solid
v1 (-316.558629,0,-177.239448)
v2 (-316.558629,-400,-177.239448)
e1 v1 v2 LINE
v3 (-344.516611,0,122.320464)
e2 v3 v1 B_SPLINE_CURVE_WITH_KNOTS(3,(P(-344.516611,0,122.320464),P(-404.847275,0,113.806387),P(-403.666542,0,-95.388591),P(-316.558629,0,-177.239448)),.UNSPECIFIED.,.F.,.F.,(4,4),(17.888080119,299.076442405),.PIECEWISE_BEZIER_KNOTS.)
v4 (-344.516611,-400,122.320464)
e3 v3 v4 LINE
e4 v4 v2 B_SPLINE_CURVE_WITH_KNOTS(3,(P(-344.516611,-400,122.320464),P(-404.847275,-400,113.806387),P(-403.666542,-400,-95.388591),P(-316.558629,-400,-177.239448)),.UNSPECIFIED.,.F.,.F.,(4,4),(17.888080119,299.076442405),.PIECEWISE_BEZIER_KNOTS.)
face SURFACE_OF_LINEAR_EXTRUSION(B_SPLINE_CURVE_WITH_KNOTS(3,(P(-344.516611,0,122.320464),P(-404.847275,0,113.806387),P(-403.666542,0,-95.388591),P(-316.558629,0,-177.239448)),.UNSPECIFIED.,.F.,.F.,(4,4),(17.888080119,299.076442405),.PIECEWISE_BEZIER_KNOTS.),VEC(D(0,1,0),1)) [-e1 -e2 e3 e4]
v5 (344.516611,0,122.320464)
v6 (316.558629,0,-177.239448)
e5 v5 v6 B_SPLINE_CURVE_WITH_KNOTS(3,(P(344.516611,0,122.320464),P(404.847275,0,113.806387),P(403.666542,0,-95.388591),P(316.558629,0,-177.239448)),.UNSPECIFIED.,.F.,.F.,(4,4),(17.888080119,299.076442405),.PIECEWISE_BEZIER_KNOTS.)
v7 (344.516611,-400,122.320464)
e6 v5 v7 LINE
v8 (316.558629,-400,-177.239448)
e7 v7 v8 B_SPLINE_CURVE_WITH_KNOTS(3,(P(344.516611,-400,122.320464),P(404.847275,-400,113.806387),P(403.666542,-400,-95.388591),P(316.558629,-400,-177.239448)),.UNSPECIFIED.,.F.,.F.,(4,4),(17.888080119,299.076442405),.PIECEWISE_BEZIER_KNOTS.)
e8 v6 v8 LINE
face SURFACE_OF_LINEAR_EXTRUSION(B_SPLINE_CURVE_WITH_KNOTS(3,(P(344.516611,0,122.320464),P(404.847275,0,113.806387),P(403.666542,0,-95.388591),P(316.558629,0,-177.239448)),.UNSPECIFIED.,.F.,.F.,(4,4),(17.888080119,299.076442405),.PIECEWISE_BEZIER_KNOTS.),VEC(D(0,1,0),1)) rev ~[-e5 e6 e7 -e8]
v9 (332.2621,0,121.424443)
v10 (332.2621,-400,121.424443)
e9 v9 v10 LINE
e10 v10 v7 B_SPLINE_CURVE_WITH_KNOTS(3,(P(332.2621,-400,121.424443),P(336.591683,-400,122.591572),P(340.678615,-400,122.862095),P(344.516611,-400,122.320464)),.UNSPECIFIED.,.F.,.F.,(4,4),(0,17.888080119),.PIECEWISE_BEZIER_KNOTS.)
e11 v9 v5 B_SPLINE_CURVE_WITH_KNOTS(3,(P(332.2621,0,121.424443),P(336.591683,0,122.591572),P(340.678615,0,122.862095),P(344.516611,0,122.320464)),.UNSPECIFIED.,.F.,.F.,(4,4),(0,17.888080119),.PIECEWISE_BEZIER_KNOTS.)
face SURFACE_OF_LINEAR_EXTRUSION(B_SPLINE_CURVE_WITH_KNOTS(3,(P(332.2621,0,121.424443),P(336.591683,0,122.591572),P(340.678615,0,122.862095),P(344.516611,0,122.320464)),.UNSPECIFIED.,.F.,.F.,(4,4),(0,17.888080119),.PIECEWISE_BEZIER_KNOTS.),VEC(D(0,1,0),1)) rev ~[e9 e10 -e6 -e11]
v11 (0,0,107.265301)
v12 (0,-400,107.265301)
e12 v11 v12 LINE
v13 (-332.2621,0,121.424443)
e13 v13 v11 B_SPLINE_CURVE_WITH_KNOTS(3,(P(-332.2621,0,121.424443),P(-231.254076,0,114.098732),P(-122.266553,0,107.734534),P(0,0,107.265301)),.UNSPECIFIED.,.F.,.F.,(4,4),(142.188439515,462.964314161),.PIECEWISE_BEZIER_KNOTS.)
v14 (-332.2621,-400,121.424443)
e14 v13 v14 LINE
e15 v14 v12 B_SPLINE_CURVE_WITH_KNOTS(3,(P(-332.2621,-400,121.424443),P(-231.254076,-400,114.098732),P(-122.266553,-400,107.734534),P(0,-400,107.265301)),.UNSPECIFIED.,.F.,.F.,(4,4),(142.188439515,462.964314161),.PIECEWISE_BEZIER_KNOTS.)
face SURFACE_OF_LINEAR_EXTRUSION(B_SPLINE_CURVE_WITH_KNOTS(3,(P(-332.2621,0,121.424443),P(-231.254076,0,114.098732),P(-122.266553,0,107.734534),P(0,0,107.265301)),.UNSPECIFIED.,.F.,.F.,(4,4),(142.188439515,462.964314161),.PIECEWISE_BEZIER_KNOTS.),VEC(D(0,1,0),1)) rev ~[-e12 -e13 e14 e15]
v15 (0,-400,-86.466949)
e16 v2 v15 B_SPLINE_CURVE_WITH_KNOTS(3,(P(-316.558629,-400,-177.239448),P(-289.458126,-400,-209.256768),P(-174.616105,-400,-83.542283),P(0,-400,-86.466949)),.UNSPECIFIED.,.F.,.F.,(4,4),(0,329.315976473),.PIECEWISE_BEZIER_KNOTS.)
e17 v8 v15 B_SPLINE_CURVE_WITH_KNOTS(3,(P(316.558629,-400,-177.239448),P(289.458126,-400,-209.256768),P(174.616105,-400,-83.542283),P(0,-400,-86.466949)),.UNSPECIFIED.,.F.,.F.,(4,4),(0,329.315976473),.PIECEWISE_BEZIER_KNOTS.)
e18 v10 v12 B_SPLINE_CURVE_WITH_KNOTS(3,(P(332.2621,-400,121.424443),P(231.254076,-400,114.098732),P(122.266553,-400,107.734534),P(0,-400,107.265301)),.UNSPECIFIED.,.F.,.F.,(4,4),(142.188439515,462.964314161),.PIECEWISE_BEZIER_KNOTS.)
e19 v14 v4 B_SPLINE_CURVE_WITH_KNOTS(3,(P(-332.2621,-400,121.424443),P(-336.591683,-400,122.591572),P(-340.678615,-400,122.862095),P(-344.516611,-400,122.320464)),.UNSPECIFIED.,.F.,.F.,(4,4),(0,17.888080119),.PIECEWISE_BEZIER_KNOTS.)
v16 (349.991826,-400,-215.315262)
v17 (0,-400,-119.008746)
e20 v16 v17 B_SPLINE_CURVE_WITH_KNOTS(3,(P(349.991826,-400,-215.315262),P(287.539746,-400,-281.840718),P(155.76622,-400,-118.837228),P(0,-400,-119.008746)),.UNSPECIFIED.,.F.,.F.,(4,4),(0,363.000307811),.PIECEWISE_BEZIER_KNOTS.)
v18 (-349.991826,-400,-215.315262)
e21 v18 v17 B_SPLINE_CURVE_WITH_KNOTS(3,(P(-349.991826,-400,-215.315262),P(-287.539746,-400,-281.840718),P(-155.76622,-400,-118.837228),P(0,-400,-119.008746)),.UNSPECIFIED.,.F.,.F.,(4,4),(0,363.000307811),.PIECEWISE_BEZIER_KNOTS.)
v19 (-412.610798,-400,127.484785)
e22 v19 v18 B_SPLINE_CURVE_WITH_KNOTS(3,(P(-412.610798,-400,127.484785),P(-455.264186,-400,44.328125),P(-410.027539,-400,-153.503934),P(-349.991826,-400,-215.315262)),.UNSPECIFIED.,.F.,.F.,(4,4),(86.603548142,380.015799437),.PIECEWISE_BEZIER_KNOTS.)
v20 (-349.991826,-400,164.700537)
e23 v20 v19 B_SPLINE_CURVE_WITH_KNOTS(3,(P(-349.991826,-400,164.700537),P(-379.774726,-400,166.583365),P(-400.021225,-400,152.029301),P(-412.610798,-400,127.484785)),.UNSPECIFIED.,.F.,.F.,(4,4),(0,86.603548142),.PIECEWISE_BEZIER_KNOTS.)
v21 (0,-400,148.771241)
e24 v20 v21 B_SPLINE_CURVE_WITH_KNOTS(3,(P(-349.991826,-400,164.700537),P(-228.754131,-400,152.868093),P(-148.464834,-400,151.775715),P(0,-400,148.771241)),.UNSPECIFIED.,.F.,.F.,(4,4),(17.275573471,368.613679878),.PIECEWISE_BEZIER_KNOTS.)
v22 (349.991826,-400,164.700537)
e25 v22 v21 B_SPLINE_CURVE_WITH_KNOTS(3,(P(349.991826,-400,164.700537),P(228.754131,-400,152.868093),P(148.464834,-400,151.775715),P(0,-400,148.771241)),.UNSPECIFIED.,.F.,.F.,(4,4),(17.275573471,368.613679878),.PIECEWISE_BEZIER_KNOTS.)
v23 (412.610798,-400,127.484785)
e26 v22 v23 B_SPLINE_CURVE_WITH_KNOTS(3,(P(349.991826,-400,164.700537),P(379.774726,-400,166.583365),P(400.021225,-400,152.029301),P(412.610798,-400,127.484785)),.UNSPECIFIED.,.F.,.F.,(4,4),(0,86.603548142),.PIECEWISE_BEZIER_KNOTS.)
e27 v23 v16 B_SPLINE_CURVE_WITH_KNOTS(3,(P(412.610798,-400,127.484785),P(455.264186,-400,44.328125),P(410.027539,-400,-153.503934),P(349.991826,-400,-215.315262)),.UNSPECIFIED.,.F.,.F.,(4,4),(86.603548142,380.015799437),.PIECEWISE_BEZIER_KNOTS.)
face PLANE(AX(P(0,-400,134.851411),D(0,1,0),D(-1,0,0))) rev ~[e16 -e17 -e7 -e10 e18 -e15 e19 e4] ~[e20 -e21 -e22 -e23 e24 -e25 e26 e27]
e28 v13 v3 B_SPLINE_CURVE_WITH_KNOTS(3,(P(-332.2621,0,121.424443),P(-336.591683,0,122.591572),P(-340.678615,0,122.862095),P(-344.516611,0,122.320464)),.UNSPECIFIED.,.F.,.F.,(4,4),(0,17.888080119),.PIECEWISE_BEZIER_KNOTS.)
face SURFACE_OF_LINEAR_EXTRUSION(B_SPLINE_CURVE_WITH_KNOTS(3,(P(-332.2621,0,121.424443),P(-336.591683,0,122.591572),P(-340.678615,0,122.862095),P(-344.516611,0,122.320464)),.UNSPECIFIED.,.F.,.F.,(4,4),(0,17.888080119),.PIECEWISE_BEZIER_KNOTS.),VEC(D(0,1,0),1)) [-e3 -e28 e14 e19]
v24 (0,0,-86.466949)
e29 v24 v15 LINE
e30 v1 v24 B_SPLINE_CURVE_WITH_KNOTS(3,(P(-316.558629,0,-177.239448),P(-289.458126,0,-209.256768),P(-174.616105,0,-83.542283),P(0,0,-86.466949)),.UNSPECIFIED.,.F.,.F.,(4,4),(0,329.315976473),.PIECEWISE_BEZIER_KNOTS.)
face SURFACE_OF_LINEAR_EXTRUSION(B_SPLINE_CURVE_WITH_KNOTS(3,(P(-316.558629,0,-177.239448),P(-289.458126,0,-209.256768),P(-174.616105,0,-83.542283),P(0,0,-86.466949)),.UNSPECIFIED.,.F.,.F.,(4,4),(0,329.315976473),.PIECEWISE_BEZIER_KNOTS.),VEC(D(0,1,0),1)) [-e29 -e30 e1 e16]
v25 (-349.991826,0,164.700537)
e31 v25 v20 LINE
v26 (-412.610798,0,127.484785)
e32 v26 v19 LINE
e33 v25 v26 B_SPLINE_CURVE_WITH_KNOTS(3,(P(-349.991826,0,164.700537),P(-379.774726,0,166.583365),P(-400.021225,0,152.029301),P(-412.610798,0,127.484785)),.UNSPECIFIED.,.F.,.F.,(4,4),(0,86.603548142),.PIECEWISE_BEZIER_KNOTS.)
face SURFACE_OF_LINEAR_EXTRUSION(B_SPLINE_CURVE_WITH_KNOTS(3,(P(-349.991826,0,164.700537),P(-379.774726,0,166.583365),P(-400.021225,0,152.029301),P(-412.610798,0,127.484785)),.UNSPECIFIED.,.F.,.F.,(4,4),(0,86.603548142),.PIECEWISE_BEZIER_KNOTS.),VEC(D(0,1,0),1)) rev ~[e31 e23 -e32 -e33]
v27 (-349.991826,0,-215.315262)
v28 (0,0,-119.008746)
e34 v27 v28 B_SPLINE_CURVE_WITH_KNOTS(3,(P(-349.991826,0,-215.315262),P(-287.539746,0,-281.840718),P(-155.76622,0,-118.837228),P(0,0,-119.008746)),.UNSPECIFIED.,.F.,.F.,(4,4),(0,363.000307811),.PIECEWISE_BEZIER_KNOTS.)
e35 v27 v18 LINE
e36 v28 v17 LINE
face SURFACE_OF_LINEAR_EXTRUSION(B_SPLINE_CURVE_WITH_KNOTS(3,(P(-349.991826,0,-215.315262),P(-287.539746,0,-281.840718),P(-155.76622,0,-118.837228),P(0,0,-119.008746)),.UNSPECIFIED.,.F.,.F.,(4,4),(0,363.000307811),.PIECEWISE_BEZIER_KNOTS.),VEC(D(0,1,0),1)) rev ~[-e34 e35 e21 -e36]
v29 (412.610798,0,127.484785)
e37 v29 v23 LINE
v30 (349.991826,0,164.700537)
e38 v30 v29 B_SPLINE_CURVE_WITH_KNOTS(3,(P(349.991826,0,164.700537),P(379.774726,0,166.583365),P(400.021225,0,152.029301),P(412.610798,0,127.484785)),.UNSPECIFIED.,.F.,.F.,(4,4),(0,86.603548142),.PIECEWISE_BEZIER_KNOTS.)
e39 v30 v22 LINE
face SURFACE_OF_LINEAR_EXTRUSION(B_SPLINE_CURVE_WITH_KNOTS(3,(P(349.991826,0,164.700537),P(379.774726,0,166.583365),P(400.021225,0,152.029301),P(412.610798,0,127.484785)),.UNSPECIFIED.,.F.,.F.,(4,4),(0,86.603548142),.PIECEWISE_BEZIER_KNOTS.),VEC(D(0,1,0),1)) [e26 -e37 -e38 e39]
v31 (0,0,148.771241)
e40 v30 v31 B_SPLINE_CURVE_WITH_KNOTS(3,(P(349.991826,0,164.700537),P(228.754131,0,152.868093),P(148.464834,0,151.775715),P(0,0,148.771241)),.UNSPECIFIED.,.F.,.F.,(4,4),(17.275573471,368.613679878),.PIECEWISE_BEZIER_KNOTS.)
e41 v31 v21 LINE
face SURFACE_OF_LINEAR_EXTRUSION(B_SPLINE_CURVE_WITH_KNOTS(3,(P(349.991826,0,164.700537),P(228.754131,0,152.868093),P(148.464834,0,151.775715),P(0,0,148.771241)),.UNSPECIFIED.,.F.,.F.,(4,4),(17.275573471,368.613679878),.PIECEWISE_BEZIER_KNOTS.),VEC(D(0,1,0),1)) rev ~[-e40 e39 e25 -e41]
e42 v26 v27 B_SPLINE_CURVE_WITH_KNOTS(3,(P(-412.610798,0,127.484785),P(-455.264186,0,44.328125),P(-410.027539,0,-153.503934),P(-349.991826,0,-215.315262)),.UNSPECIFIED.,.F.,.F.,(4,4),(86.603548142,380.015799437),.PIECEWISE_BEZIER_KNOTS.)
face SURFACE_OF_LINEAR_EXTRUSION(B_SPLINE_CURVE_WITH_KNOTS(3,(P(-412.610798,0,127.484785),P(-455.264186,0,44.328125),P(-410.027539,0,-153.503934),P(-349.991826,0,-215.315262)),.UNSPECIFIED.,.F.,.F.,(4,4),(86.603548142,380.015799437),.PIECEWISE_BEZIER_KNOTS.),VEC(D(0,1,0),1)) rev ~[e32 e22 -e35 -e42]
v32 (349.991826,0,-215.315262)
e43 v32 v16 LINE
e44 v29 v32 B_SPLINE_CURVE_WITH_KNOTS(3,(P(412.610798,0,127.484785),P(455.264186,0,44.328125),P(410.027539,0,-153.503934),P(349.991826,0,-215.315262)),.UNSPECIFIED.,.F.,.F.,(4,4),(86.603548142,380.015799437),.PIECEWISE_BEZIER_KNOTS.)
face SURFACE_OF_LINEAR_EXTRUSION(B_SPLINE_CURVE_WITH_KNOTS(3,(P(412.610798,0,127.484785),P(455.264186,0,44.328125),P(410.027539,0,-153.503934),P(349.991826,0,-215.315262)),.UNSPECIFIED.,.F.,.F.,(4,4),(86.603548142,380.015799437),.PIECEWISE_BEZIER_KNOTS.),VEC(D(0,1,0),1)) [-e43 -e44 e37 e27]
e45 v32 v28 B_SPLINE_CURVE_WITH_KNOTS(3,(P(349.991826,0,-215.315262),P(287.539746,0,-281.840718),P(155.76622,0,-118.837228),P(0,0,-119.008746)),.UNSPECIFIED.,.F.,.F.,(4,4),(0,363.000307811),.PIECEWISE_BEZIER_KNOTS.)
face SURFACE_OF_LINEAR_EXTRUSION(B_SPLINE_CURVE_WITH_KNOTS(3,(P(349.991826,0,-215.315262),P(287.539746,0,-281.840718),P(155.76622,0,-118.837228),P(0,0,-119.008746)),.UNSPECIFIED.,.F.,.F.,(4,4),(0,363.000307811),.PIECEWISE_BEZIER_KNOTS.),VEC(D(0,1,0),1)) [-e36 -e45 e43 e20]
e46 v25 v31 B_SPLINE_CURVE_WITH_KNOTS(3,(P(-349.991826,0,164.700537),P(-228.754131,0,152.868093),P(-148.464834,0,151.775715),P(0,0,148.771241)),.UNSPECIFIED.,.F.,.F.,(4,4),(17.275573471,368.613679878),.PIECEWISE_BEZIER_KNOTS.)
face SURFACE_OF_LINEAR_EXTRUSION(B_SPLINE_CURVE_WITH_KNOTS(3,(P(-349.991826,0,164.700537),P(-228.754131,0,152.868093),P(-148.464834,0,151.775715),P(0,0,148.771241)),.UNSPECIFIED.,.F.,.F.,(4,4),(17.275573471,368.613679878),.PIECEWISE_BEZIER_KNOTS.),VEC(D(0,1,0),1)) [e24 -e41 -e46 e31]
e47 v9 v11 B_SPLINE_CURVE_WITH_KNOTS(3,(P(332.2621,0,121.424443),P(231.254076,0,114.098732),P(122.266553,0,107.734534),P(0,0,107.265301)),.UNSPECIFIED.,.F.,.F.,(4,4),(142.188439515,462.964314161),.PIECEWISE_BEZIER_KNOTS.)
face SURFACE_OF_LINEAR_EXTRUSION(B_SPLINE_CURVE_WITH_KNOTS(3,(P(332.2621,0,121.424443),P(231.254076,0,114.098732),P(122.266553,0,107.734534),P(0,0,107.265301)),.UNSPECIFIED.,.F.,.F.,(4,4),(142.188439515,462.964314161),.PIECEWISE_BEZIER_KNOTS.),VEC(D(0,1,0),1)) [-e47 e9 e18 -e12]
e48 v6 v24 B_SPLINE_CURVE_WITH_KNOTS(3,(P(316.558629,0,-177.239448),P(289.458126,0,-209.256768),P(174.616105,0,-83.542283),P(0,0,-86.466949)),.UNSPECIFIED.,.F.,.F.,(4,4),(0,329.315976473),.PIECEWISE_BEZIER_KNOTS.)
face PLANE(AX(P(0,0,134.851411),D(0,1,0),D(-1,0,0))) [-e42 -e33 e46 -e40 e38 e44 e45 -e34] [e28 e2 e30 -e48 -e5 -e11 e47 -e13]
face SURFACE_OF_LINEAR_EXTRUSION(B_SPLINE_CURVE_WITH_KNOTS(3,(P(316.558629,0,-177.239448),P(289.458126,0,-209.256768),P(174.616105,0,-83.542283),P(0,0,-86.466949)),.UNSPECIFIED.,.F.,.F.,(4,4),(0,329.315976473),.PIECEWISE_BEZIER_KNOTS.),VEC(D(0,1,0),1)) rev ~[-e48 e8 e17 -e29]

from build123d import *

# Parameters (mm, degrees)
F1_DEPTH = 400


with BuildPart() as f1:
    # F0 (on Front) → F1 (new body)
    with BuildSketch(Plane.XZ):
        with BuildLine():
            add(Edge.make_bspline(
                [(-349.9918261405, 164.7005370527), (-228.7541310859, 152.8680934101), (-148.4648335347, 151.7757154689), (0, 148.7712413073)],
                knots=[17.2755734709, 17.2755734709, 17.2755734709, 17.2755734709, 368.6136798781, 368.6136798781, 368.6136798781, 368.6136798781], degree=3))
            add(Edge.make_bspline(
                [(-349.9918261405, 164.7005370527), (-379.7747257767, 166.5833651071), (-400.0212253579, 152.0293008743), (-412.6107976831, 127.4847845064)],
                knots=[0, 0, 0, 0, 86.6035481416, 86.6035481416, 86.6035481416, 86.6035481416], degree=3))
            add(Edge.make_bspline(
                [(-412.6107976774, 127.4847845008), (-390.2805647898, 125.7630890537), (-367.6040024639, 124.021633923), (-344.5166107631, 122.3204635533)],
                knots=[55.3884070152, 55.3884070152, 55.3884070152, 55.3884070152, 129.1746995747, 129.1746995747, 129.1746995747, 129.1746995747], degree=3))
            add(Edge.make_bspline(
                [(-332.2621001683, 121.4244425258), (-336.5916827882, 122.5915718518), (-340.6786149646, 122.8620951072), (-344.5166107631, 122.3204635533)],
                knots=[0, 0, 0, 0, 17.888080119, 17.888080119, 17.888080119, 17.888080119], degree=3))
            add(Edge.make_bspline(
                [(-332.2621001683, 121.4244425258), (-231.2540764526, 114.0987320503), (-122.2665528935, 107.7345344123), (0, 107.2653010488)],
                knots=[142.1884395148, 142.1884395148, 142.1884395148, 142.1884395148, 462.9643141605, 462.9643141605, 462.9643141605, 462.9643141605], degree=3))
            add(Edge.make_bspline(
                [(332.2621001683, 121.4244425258), (231.2540764526, 114.0987320503), (122.2665528935, 107.7345344123), (0, 107.2653010488)],
                knots=[142.1884395148, 142.1884395148, 142.1884395148, 142.1884395148, 462.9643141605, 462.9643141605, 462.9643141605, 462.9643141605], degree=3))
            add(Edge.make_bspline(
                [(332.2621001683, 121.4244425258), (336.5916827882, 122.5915718518), (340.6786149646, 122.8620951072), (344.5166107631, 122.3204635533)],
                knots=[0, 0, 0, 0, 17.888080119, 17.888080119, 17.888080119, 17.888080119], degree=3))
            add(Edge.make_bspline(
                [(412.6107976774, 127.4847845008), (390.2805647898, 125.7630890537), (367.6040024639, 124.021633923), (344.5166107631, 122.3204635533)],
                knots=[55.3884070152, 55.3884070152, 55.3884070152, 55.3884070152, 129.1746995747, 129.1746995747, 129.1746995747, 129.1746995747], degree=3))
            add(Edge.make_bspline(
                [(349.9918261405, 164.7005370527), (379.7747257767, 166.5833651071), (400.0212253579, 152.0293008743), (412.6107976831, 127.4847845064)],
                knots=[0, 0, 0, 0, 86.6035481416, 86.6035481416, 86.6035481416, 86.6035481416], degree=3))
            add(Edge.make_bspline(
                [(349.9918261405, 164.7005370527), (228.7541310859, 152.8680934101), (148.4648335347, 151.7757154689), (0, 148.7712413073)],
                knots=[17.2755734709, 17.2755734709, 17.2755734709, 17.2755734709, 368.6136798781, 368.6136798781, 368.6136798781, 368.6136798781], degree=3))
        make_face()
        with BuildLine():
            add(Edge.make_bspline(
                [(-412.6107976774, 127.4847845008), (-390.2805647898, 125.7630890537), (-367.6040024639, 124.021633923), (-344.5166107631, 122.3204635533)],
                knots=[55.3884070152, 55.3884070152, 55.3884070152, 55.3884070152, 129.1746995747, 129.1746995747, 129.1746995747, 129.1746995747], degree=3))
            add(Edge.make_bspline(
                [(-412.6107976831, 127.4847845064), (-455.2641858876, 44.3281245427), (-410.0275390456, -153.5039344324), (-349.9918261405, -215.3152623841)],
                knots=[86.6035481416, 86.6035481416, 86.6035481416, 86.6035481416, 380.0157994368, 380.0157994368, 380.0157994368, 380.0157994368], degree=3))
            add(Edge.make_bspline(
                [(-349.9918261405, -215.3152623841), (-287.5397462749, -281.8407177446), (-155.7662200923, -118.8372276745), (0, -119.0087459604)],
                knots=[0, 0, 0, 0, 363.0003078109, 363.0003078109, 363.0003078109, 363.0003078109], degree=3))
            add(Edge.make_bspline(
                [(349.9918261405, -215.3152623841), (287.5397462749, -281.8407177446), (155.7662200923, -118.8372276745), (0, -119.0087459604)],
                knots=[0, 0, 0, 0, 363.0003078109, 363.0003078109, 363.0003078109, 363.0003078109], degree=3))
            add(Edge.make_bspline(
                [(412.6107976831, 127.4847845064), (455.2641858876, 44.3281245427), (410.0275390456, -153.5039344324), (349.9918261405, -215.3152623841)],
                knots=[86.6035481416, 86.6035481416, 86.6035481416, 86.6035481416, 380.0157994368, 380.0157994368, 380.0157994368, 380.0157994368], degree=3))
            add(Edge.make_bspline(
                [(412.6107976774, 127.4847845008), (390.2805647898, 125.7630890537), (367.6040024639, 124.021633923), (344.5166107631, 122.3204635533)],
                knots=[55.3884070152, 55.3884070152, 55.3884070152, 55.3884070152, 129.1746995747, 129.1746995747, 129.1746995747, 129.1746995747], degree=3))
            add(Edge.make_bspline(
                [(344.5166107631, 122.3204635533), (404.847274862, 113.8063866609), (403.6665423185, -95.3885912359), (316.5586292744, -177.2394478321)],
                knots=[17.888080119, 17.888080119, 17.888080119, 17.888080119, 299.0764424053, 299.0764424053, 299.0764424053, 299.0764424053], degree=3))
            add(Edge.make_bspline(
                [(316.5586292744, -177.2394478321), (289.4581258297, -209.2567682266), (174.6161052003, -83.5422830285), (0, -86.466948735)],
                knots=[0, 0, 0, 0, 329.3159764731, 329.3159764731, 329.3159764731, 329.3159764731], degree=3))
            add(Edge.make_bspline(
                [(-316.5586292744, -177.2394478321), (-289.4581258297, -209.2567682266), (-174.6161052003, -83.5422830285), (0, -86.466948735)],
                knots=[0, 0, 0, 0, 329.3159764731, 329.3159764731, 329.3159764731, 329.3159764731], degree=3))
            add(Edge.make_bspline(
                [(-344.5166107631, 122.3204635533), (-404.847274862, 113.8063866609), (-403.6665423185, -95.3885912359), (-316.5586292744, -177.2394478321)],
                knots=[17.888080119, 17.888080119, 17.888080119, 17.888080119, 299.0764424053, 299.0764424053, 299.0764424053, 299.0764424053], degree=3))
        make_face()
    extrude(amount=F1_DEPTH)


solid = f1.part
